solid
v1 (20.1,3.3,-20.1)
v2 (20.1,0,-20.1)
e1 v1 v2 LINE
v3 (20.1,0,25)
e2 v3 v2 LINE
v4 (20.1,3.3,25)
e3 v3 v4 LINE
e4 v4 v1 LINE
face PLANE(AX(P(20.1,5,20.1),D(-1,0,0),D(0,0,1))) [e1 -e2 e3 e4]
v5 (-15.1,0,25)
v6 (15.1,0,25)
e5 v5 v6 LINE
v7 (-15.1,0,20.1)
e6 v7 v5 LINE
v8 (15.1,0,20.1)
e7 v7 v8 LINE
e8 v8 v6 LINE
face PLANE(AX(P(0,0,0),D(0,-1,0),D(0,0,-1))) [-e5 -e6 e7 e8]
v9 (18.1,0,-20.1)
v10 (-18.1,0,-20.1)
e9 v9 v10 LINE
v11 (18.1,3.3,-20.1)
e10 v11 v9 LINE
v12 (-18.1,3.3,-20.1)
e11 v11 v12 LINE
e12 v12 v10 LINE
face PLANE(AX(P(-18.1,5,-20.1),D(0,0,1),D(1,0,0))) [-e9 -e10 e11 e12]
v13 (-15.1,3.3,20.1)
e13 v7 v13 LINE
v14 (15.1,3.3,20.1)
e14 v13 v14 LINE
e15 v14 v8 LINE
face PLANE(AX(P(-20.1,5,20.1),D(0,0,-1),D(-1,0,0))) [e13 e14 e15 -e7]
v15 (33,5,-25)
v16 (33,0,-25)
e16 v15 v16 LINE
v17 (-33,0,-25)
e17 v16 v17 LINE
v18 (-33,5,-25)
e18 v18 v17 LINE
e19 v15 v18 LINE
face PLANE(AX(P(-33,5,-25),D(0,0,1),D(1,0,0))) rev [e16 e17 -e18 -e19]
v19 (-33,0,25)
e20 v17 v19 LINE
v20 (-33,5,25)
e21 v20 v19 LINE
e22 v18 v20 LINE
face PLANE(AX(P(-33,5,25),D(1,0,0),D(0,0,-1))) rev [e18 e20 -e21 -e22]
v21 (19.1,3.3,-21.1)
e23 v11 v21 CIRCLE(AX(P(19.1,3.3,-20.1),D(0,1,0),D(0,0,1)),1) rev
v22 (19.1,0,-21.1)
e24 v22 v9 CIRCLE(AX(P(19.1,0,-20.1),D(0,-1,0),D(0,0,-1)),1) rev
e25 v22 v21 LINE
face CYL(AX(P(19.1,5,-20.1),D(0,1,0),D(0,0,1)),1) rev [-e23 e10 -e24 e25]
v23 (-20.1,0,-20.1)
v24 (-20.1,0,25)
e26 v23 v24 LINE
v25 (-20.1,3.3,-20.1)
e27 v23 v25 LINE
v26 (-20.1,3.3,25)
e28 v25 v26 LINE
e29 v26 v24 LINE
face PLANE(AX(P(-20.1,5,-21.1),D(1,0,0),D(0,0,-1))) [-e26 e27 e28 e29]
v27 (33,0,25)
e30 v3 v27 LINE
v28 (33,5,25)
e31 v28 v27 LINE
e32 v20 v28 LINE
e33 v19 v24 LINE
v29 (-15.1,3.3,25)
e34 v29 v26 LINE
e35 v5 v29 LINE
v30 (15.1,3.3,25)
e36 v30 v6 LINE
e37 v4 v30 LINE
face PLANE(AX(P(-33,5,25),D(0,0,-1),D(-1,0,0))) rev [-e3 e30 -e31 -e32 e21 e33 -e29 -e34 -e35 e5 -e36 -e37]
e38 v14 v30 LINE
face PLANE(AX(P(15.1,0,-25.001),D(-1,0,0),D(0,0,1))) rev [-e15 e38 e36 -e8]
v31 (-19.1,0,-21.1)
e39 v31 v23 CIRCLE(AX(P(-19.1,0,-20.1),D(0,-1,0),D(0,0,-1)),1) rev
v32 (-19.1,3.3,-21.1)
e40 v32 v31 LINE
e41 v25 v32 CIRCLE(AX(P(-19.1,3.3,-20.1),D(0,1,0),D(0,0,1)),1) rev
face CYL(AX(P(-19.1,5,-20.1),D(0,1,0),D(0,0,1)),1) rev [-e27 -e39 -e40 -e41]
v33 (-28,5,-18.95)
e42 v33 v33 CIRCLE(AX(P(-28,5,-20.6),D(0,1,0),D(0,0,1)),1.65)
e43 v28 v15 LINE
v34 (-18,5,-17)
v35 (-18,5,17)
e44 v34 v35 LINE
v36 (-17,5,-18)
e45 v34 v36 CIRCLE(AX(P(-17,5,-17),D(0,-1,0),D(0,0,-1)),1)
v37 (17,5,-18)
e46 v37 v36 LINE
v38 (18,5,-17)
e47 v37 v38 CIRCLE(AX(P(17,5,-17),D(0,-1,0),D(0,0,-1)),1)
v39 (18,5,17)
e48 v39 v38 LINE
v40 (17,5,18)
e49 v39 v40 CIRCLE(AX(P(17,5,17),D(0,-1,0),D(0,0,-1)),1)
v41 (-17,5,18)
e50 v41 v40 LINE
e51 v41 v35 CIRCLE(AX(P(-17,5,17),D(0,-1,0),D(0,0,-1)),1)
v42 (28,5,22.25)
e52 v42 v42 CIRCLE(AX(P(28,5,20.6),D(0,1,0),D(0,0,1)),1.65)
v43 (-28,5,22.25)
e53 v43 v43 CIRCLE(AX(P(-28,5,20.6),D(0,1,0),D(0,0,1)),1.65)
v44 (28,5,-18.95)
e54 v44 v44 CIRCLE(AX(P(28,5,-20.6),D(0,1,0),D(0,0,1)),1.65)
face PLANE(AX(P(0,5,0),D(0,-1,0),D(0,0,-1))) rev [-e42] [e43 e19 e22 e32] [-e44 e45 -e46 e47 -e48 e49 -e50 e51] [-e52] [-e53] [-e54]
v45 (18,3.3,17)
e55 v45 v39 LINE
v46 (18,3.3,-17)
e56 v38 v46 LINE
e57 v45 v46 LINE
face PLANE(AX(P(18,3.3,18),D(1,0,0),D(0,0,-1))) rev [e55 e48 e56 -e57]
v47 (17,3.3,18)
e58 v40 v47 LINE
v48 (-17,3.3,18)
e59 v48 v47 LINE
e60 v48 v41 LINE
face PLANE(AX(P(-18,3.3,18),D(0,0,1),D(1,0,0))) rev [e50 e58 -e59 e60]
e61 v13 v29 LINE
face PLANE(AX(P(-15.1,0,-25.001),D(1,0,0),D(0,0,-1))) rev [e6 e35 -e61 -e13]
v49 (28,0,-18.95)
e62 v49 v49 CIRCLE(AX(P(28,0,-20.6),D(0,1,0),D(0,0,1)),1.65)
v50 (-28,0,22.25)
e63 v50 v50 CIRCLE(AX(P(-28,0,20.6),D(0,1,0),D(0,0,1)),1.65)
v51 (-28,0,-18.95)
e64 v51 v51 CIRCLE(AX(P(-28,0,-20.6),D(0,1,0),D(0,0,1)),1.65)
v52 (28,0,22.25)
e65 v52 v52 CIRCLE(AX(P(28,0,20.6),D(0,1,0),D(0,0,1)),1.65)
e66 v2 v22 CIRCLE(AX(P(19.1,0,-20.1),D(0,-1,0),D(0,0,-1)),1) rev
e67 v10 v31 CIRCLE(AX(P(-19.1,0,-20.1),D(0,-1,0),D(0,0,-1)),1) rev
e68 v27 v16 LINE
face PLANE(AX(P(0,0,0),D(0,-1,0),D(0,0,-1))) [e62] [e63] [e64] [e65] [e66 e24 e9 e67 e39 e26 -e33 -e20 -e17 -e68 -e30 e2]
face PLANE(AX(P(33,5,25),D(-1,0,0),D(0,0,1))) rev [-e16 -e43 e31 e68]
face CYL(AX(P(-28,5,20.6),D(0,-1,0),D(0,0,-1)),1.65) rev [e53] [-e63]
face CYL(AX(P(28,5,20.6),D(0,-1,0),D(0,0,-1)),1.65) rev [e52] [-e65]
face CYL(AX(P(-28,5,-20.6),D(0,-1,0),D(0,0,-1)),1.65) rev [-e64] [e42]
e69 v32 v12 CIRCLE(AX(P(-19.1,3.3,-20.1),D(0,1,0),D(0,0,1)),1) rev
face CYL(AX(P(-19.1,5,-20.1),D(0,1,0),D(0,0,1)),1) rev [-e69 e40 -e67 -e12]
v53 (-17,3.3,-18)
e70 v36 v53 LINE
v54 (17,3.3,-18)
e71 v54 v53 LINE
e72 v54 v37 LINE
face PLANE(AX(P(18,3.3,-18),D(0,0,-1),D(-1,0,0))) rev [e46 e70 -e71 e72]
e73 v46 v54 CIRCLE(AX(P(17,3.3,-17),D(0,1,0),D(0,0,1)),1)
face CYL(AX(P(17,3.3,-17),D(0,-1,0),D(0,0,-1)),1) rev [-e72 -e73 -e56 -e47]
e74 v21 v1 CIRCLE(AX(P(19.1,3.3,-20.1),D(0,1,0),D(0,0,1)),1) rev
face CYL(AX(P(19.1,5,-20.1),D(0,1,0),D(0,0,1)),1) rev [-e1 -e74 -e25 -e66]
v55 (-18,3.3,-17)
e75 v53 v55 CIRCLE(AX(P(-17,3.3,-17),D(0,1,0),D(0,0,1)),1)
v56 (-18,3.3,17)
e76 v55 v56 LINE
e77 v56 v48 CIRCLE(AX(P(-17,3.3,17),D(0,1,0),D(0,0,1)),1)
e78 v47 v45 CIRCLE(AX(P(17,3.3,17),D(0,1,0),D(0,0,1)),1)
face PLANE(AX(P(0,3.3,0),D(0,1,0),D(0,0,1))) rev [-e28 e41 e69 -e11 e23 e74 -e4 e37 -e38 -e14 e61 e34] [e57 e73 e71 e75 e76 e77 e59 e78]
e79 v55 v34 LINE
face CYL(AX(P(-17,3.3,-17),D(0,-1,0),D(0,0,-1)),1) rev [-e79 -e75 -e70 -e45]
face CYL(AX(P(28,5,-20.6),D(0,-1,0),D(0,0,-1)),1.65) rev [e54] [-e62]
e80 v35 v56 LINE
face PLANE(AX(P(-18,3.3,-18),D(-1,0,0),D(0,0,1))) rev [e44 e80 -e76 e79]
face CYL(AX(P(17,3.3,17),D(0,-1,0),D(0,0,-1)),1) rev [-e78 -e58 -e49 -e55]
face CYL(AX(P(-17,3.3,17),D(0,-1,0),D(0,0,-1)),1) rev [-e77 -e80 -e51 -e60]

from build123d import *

# Parameters (mm, degrees)
SKETCH1_W           = 66
SKETCH1_H           = 50
SKETCH1_R           = 1.65
BOSS_EXTRUDE1_DEPTH = 5
SKETCH2_W           = 36
SKETCH2_H           = 36
BOSS_EXTRUDE2_DEPTH = 1.7
CUT_EXTRUDE1_REACH  = 62.117
SKETCH3_W           = 5
SKETCH3_H           = 3.3
FILLET1_R           = 1


with BuildPart() as part:
    # Sketch1 → Boss-Extrude1 (new body)
    with BuildSketch(Plane(origin=(0, 0, 0), x_dir=(1, 0, 0), z_dir=(0, 1, 0))):
        Rectangle(SKETCH1_W, SKETCH1_H)
        with Locations(Location((-28, 20.6, 0), (0, 0, 270))):
            Circle(SKETCH1_R, mode=Mode.SUBTRACT)
        with Locations(Location((28, 20.6, 0), (0, 0, 270))):
            Circle(SKETCH1_R, mode=Mode.SUBTRACT)
        with Locations(Location((-28, -20.6, 0), (0, 0, 270))):
            Circle(SKETCH1_R, mode=Mode.SUBTRACT)
        with Locations(Location((28, -20.6, 0), (0, 0, 270))):
            Circle(SKETCH1_R, mode=Mode.SUBTRACT)
        Polygon((20.1, -20.1), (20.1, 21.1), (18.1, 21.1), (18.1, 20.1), (-18.1, 20.1), (-18.1, 21.1), (-20.1, 21.1), (-20.1, -20.1), align=None, mode=Mode.SUBTRACT)
    extrude(amount=BOSS_EXTRUDE1_DEPTH)

    # Sketch2 → Boss-Extrude2 (add)
    with BuildSketch(Plane(origin=(0, 5, 0), x_dir=(1, 0, 0), z_dir=(0, 1, 0))):
        Polygon((-20.1, 21.1), (-20.1, -20.1), (20.1, -20.1), (20.1, 21.1), (18.1, 21.1), (18.1, 20.1), (-18.1, 20.1), (-18.1, 21.1), align=None)
        Rectangle(SKETCH2_W, SKETCH2_H, mode=Mode.SUBTRACT)
    extrude(amount=-BOSS_EXTRUDE2_DEPTH)

    # Sketch3 → Cut-Extrude1 (cut, up to next)
    with BuildSketch(Plane.XY.offset(25), mode=Mode.PRIVATE) as cut_extrude1_sk1:
        with Locations((-17.6, 1.65)):
            Rectangle(SKETCH3_W, SKETCH3_H)
    cut_extrude1_tool1 = extrude(cut_extrude1_sk1.sketch, amount=-CUT_EXTRUDE1_REACH, mode=Mode.PRIVATE) & part.part
    # Sketch3 → Cut-Extrude1 (cut, up to next)
    with BuildSketch(Plane.XY.offset(25), mode=Mode.PRIVATE) as cut_extrude1_sk2:
        with Locations((17.6, 1.65)):
            Rectangle(SKETCH3_W, SKETCH3_H)
    cut_extrude1_tool2 = extrude(cut_extrude1_sk2.sketch, amount=-CUT_EXTRUDE1_REACH, mode=Mode.PRIVATE) & part.part
    add(cut_extrude1_tool1.solids().sort_by_distance((-17.6, 1.65, 25))[0], mode=Mode.SUBTRACT)
    add(cut_extrude1_tool2.solids().sort_by_distance((17.6, 1.65, 25))[0], mode=Mode.SUBTRACT)

    # Fillet1
    fillet1_edges = [part.edges().sort_by_distance(p)[0] for p in [
        (-18, 4.15, 18),
        (18, 4.15, 18),
        (18, 4.15, -18),
        (-18, 4.15, -18),
        (-20.1, 1.65, -21.1),
        (-18.1, 1.65, -21.1),
        (18.1, 1.65, -21.1),
        (20.1, 1.65, -21.1),
    ]]
    fillet(fillet1_edges, radius=FILLET1_R - 0.0001)  # a hair under: the kernel refuses the full size


solid = part.part
